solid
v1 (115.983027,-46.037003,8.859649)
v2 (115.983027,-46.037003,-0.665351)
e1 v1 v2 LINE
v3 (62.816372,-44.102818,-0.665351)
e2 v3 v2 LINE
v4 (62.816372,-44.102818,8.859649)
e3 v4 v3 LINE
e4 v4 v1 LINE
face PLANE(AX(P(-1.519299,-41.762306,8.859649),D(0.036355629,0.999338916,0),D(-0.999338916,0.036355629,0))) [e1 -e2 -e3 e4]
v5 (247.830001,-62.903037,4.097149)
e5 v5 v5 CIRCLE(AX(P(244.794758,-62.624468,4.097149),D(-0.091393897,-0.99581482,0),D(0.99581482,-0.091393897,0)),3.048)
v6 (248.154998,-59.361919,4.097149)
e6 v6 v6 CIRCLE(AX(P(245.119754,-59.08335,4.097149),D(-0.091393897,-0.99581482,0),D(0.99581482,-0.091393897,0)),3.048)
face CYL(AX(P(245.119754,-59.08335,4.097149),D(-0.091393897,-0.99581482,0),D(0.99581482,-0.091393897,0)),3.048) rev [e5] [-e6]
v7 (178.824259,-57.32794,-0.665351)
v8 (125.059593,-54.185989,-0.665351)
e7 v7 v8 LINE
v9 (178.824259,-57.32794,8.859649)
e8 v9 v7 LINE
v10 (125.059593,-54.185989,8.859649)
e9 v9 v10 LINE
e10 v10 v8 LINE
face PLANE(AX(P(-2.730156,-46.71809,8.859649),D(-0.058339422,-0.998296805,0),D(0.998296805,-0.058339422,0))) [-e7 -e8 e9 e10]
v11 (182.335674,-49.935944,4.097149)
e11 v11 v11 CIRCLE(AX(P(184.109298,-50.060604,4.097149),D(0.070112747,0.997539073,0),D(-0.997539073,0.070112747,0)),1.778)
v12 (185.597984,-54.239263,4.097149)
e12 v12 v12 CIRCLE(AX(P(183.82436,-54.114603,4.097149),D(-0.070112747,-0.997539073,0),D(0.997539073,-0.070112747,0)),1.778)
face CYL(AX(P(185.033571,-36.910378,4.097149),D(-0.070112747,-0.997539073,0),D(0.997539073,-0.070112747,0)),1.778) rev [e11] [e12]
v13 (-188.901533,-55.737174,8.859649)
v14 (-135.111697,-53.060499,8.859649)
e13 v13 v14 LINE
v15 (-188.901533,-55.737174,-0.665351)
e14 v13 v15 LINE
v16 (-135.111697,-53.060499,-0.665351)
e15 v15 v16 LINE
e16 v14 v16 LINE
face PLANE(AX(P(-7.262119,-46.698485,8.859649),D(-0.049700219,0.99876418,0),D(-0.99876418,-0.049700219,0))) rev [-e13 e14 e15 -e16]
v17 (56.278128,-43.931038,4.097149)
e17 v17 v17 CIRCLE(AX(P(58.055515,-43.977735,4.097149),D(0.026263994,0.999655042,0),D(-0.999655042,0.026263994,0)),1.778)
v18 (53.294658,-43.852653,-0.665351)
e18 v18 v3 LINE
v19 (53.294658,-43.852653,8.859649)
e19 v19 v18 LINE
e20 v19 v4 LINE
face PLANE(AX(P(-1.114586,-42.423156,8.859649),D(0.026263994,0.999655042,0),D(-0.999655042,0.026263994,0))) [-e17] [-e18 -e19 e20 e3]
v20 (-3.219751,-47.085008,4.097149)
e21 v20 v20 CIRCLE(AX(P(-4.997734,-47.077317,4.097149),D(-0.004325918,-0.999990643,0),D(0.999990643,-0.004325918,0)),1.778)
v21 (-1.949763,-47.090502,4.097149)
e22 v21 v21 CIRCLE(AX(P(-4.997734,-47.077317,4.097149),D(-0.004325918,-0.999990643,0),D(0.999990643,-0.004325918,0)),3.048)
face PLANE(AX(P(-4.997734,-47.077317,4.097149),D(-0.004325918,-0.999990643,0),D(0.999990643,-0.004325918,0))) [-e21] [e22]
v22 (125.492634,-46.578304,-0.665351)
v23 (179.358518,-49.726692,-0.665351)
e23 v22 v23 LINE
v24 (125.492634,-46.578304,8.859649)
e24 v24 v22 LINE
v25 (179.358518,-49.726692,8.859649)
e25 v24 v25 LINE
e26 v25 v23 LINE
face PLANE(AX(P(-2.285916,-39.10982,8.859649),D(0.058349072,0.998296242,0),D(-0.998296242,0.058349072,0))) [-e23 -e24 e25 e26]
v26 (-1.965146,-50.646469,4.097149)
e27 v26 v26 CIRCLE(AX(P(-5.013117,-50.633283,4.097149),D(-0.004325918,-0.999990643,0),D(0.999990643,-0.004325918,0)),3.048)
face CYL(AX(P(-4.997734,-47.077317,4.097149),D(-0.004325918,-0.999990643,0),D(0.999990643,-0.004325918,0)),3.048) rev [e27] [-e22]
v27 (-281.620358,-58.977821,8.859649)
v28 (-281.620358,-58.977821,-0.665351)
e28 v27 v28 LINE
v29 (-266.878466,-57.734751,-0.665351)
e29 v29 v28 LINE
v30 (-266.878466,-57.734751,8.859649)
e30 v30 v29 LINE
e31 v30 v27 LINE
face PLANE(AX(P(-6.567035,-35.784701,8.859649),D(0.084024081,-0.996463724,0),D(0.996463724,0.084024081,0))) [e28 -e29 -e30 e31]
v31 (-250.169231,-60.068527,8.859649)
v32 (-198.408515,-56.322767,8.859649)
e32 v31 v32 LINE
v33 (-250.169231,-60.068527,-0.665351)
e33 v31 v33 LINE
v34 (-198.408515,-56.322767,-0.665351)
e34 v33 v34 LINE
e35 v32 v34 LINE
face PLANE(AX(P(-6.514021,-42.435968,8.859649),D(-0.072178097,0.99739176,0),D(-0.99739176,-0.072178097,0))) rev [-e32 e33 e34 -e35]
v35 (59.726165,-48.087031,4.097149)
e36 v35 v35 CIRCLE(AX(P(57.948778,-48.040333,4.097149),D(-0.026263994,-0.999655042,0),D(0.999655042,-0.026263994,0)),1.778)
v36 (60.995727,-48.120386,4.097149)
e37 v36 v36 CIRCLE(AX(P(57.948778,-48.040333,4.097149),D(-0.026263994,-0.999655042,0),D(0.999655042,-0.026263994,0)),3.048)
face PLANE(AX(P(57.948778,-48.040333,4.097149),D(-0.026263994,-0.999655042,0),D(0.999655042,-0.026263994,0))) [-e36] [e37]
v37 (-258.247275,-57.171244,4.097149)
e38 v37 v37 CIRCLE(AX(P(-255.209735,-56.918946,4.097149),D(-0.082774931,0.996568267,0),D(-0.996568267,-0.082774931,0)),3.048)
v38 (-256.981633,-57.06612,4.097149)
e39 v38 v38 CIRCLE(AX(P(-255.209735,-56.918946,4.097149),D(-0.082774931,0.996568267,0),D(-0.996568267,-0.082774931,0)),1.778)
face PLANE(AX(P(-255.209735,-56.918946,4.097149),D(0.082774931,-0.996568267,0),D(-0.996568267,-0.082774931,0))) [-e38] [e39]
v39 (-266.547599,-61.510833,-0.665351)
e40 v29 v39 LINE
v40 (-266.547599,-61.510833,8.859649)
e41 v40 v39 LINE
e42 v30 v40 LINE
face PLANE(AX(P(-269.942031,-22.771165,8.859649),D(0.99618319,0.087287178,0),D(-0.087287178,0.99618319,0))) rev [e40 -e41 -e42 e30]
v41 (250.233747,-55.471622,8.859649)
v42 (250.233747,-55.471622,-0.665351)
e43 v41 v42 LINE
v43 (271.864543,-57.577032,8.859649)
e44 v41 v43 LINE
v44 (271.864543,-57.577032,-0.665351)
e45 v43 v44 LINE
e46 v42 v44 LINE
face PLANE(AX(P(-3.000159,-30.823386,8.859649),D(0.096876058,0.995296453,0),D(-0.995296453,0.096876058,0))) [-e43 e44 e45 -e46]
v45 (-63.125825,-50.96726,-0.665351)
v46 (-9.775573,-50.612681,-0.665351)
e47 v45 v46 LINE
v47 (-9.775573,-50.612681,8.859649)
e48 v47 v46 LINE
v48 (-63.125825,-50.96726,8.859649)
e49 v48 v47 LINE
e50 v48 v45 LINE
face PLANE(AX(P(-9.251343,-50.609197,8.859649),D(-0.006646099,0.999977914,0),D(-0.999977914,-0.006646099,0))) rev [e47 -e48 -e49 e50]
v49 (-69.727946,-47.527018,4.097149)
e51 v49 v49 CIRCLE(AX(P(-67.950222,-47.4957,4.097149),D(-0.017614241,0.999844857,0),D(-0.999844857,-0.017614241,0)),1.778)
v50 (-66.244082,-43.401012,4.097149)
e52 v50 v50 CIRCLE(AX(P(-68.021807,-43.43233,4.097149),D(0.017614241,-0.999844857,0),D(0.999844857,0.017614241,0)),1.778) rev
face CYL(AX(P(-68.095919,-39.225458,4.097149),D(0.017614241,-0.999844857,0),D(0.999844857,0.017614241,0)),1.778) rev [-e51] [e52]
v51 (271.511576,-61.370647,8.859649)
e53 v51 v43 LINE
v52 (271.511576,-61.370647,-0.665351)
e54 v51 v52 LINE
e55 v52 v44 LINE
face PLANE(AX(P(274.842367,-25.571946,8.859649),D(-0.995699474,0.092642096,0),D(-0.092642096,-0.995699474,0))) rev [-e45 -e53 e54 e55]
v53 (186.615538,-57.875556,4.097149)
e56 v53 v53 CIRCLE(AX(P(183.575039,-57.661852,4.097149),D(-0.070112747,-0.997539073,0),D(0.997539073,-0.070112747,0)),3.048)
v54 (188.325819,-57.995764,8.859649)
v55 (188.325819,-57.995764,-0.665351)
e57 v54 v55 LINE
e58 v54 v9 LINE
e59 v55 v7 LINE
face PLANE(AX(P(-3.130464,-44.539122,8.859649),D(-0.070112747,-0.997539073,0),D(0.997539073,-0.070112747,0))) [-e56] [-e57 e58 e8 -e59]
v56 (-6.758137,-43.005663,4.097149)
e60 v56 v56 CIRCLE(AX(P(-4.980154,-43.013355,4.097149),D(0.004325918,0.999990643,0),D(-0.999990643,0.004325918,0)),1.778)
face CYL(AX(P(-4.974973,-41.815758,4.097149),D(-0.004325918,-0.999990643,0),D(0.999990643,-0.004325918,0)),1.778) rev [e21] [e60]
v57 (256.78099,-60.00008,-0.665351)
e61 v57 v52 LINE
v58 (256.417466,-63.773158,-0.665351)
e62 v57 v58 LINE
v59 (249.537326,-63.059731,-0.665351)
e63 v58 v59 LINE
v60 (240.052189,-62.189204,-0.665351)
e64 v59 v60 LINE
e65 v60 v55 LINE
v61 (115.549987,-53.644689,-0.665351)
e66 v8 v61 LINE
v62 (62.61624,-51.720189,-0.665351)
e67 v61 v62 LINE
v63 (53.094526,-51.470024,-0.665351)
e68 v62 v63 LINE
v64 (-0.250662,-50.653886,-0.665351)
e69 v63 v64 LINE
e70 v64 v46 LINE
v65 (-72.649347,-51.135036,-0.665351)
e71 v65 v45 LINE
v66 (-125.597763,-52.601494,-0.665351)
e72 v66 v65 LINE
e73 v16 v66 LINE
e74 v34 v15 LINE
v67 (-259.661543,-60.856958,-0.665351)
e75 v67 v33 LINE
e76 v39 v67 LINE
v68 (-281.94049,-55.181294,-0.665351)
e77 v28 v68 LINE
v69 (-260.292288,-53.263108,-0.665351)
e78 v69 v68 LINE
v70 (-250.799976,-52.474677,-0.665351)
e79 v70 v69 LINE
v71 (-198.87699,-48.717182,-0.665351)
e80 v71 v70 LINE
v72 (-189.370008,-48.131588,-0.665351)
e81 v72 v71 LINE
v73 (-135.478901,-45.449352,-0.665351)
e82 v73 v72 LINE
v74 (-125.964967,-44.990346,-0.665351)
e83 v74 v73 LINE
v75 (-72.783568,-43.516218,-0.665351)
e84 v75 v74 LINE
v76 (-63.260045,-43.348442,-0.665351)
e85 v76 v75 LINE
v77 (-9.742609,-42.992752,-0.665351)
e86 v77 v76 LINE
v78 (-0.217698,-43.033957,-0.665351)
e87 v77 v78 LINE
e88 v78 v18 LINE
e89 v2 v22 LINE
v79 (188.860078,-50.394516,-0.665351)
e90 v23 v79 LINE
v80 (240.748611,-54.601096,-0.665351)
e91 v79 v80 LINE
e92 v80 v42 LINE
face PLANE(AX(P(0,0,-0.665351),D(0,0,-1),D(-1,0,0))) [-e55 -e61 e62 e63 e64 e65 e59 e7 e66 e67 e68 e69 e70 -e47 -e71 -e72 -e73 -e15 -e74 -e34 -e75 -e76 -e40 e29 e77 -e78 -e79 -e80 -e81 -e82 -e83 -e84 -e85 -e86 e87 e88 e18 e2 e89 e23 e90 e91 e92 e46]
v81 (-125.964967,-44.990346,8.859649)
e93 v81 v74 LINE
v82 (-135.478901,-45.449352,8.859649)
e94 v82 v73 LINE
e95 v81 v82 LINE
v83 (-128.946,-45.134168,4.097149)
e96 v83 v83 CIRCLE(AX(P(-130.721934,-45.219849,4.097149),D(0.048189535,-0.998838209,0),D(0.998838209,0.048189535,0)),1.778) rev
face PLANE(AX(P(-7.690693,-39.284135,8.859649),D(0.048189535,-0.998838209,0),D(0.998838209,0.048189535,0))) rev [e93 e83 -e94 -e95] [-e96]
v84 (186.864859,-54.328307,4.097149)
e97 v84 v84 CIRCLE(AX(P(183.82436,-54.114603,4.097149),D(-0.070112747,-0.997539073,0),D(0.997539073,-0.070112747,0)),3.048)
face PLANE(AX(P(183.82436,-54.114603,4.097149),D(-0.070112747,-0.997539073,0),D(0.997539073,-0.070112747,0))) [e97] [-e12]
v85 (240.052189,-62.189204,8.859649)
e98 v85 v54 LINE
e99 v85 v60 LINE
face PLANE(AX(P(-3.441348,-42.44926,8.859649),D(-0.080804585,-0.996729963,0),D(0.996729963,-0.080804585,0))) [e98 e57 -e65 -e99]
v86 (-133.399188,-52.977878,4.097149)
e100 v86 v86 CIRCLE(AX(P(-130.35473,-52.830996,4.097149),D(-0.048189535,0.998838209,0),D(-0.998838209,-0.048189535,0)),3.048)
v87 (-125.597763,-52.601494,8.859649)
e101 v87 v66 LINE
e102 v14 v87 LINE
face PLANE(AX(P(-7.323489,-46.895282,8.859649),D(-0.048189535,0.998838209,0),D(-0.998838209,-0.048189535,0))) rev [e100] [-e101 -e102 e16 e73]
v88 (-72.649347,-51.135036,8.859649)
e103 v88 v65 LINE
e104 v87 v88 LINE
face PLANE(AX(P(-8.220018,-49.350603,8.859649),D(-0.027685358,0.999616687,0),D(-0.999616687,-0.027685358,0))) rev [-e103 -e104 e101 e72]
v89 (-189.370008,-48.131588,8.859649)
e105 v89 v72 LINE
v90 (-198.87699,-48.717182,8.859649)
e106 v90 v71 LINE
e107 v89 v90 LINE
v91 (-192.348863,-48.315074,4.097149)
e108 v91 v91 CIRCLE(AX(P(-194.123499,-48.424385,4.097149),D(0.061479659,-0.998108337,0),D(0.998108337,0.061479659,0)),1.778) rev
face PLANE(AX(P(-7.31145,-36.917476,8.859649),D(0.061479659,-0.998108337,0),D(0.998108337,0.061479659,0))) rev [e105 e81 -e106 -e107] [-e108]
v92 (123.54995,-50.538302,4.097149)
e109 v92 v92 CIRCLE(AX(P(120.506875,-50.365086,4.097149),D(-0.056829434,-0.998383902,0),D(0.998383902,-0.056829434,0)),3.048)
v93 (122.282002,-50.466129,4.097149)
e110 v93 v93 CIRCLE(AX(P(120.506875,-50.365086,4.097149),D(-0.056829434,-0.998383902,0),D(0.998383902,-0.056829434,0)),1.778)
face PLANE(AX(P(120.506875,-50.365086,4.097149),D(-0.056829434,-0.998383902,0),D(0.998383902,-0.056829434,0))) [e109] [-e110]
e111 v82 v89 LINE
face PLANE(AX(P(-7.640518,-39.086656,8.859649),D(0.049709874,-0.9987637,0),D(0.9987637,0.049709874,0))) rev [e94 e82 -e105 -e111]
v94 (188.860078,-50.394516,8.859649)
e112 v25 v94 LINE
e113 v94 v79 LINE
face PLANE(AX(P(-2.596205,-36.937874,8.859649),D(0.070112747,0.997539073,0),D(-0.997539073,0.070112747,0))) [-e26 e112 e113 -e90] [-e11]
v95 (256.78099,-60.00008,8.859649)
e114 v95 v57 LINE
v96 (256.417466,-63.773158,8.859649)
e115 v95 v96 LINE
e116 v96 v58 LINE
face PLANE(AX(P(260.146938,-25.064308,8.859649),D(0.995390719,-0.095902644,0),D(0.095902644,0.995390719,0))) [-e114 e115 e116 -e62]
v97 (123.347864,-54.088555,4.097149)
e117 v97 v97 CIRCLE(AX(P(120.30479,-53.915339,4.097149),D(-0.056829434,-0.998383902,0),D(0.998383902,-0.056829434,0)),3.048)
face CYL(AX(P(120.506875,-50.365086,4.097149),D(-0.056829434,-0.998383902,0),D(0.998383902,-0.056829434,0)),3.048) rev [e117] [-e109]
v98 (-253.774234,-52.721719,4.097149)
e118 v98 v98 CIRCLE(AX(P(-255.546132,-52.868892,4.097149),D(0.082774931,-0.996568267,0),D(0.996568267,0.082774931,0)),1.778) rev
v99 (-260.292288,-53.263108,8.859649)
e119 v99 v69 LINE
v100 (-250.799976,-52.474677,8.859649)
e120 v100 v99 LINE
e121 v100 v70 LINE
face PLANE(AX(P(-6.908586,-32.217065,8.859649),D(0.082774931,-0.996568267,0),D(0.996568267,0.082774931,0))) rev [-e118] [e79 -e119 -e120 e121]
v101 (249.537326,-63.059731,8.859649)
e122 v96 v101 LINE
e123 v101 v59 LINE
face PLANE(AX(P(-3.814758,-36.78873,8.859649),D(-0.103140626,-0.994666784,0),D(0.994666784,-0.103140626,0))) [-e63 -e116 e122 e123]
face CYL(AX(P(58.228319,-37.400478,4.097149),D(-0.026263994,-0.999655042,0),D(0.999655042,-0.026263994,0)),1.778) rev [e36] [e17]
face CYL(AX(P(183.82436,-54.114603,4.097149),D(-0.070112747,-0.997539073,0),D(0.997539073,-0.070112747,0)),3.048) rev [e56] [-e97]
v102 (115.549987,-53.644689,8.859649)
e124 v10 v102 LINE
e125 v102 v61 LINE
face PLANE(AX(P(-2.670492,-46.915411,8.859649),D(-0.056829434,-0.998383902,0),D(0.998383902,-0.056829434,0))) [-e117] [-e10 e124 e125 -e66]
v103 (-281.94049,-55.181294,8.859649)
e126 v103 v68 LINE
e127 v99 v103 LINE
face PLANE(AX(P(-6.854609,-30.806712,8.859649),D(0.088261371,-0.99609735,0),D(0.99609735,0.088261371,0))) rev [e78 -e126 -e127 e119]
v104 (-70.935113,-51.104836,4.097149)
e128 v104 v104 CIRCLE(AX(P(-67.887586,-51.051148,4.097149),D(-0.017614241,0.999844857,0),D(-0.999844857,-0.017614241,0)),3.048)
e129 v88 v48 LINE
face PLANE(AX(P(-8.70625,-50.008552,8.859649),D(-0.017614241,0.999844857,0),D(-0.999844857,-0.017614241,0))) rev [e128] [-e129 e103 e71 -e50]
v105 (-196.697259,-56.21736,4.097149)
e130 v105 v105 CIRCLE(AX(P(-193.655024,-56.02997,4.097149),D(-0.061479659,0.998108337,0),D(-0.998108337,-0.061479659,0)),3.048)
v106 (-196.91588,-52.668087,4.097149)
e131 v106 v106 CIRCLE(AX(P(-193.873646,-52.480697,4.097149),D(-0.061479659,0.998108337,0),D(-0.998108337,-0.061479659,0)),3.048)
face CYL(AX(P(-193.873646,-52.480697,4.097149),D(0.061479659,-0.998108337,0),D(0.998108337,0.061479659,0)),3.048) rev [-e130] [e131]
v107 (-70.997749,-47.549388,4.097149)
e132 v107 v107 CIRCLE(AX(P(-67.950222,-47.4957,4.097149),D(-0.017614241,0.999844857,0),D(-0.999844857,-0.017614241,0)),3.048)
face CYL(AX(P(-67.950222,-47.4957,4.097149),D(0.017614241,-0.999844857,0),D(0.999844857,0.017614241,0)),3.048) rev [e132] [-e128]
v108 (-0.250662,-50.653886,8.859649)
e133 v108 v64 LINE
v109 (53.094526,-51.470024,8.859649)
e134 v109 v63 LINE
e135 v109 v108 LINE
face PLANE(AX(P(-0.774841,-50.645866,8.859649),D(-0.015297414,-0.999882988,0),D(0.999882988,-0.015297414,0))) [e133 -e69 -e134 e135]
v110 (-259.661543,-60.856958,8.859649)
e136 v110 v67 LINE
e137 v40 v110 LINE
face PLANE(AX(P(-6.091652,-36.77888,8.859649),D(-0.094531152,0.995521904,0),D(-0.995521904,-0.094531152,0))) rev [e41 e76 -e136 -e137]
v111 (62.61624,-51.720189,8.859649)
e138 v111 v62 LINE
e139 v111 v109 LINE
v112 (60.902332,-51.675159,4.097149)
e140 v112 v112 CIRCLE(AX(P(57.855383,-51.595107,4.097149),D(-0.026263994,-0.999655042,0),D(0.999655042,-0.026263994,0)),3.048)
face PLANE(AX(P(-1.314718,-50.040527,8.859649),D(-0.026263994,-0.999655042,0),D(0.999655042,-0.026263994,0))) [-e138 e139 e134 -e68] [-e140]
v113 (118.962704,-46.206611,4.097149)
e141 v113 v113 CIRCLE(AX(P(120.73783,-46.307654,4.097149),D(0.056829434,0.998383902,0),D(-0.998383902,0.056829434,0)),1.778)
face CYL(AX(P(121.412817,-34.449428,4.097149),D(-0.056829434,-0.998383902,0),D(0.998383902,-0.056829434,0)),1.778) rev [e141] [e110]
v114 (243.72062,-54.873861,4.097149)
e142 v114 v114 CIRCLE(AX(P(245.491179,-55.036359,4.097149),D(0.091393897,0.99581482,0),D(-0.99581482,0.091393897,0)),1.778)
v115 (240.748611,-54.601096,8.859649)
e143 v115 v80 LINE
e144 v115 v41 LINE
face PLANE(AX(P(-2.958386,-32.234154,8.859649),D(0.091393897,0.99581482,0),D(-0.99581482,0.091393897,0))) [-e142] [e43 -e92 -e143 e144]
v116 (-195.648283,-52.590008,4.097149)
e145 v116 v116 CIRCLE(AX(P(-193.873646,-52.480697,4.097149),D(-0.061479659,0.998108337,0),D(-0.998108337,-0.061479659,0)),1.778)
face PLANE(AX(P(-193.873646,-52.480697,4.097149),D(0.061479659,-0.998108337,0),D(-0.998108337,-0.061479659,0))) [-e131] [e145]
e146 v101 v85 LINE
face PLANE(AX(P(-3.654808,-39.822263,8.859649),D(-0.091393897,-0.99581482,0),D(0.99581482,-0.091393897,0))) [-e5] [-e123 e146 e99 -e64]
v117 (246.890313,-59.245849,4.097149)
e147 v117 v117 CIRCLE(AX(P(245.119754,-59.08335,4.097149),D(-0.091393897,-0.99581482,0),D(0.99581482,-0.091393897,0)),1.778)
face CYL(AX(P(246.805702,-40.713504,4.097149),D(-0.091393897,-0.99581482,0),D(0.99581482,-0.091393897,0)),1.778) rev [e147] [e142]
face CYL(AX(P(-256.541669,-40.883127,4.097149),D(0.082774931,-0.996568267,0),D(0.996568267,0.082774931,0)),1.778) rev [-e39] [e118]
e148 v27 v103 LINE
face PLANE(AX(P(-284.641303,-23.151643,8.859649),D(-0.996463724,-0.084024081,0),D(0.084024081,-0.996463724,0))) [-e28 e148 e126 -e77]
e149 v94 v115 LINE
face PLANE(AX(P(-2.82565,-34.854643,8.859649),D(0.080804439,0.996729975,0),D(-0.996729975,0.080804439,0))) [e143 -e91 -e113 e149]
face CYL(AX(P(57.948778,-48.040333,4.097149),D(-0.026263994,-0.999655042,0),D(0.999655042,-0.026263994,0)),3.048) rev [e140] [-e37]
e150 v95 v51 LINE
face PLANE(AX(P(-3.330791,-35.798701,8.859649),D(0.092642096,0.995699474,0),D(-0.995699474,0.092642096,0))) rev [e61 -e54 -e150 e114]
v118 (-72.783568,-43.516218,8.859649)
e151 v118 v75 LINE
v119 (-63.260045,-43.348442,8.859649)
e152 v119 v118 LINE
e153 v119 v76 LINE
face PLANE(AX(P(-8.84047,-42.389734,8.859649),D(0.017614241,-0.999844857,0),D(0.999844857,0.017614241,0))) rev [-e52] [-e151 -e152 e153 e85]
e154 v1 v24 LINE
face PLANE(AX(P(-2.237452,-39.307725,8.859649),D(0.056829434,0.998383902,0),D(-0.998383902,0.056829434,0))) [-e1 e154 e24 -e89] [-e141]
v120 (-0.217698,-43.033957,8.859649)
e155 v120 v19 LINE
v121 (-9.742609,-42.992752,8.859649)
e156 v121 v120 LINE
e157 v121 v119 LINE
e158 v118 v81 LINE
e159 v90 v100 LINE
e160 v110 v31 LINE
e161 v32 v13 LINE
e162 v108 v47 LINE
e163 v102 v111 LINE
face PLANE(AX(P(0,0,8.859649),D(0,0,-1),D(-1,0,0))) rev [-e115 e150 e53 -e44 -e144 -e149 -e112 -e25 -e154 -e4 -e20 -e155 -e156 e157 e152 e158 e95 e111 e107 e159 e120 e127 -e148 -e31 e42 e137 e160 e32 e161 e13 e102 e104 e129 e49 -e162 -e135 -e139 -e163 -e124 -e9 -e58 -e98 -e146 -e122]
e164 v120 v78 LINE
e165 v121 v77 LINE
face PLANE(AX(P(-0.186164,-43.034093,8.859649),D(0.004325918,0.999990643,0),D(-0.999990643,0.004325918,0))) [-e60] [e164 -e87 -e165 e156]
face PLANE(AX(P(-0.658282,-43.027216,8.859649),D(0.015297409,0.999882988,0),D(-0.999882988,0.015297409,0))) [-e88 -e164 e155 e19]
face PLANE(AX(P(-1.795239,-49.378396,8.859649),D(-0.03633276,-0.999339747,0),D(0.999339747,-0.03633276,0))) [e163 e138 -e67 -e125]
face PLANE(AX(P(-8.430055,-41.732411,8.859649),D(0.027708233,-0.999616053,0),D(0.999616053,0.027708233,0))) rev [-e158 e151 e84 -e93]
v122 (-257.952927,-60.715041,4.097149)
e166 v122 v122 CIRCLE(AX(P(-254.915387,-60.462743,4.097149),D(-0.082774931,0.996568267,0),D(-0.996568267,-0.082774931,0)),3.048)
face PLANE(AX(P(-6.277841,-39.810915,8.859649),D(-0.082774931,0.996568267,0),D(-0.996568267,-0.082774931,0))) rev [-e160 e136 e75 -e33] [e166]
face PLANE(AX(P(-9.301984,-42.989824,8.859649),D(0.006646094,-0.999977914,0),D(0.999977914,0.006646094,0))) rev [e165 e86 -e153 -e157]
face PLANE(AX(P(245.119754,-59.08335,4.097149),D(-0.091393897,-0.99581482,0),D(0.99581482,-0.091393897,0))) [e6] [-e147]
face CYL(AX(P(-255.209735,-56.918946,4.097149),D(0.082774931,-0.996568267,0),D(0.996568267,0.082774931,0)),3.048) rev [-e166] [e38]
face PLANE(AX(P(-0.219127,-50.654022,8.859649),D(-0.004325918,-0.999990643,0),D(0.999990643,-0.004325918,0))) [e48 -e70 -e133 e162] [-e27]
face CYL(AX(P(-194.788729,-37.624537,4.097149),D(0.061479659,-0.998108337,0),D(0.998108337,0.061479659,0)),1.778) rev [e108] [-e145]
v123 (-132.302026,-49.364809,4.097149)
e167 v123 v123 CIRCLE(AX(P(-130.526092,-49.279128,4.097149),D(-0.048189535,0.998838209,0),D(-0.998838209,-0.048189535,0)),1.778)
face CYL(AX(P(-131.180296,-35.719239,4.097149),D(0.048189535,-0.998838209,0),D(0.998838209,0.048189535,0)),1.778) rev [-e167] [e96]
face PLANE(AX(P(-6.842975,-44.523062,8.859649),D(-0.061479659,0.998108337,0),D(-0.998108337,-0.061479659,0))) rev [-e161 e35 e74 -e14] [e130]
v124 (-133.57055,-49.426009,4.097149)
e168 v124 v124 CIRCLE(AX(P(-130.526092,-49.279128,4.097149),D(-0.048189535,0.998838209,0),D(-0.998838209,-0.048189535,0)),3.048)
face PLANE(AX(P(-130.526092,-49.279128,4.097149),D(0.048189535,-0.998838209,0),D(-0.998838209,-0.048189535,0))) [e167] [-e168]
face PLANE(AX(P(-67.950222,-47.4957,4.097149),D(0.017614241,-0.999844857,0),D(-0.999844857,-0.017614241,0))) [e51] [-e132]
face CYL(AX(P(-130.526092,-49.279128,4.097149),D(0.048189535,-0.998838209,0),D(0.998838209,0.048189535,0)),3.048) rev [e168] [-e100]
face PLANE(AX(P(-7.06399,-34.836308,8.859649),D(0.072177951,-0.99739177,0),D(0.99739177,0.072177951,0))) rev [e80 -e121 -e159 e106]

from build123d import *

# Parameters (mm, degrees)
BOSS_EXTRUDE1_DEPTH = 4.7625
SKETCH2_R           = 3.048
CUT_EXTRUDE1_DEPTH  = 3.556
SKETCH3_R           = 1.778
CUT_EXTRUDE2_DEPTH  = 277.706047268
SKETCH4_R           = 3.048
CUT_EXTRUDE3_DEPTH  = 3.556
SKETCH5_R           = 3.048
CUT_EXTRUDE4_DEPTH  = 3.556
SKETCH6_R           = 3.048
CUT_EXTRUDE5_DEPTH  = 3.556
SKETCH7_R           = 3.048
CUT_EXTRUDE6_DEPTH  = 3.556
SKETCH8_R           = 1.778
CUT_EXTRUDE7_DEPTH  = 273.722762612
SKETCH9_R           = 1.778
CUT_EXTRUDE8_DEPTH  = 274.775889667
SKETCH10_R          = 1.778
CUT_EXTRUDE9_DEPTH  = 276.233622552
SKETCH11_R          = 1.778
CUT_EXTRUDE10_DEPTH = 276.83087619


with BuildPart() as part:
    # Sketch1 → Boss-Extrude1 (new, symmetric)
    with BuildSketch(Plane(origin=(0, 0, 4.097149242), x_dir=(-1, 0, 0), z_dir=(0, 0, -1))):
        Polygon((0.250661746, -50.653885537), (5.013117184, -50.633283353), (4.98015369, -43.013354652), (0.217698252, -43.033956836), (-53.294657701, -43.852653014), (-62.816371972, -44.102817558), (-115.983026964, -46.037003418), (-125.492633629, -46.578303782), (-179.358518215, -49.726692243), (-188.860077886, -50.394516158), (-240.748610926, -54.601095566), (-250.233747084, -55.471622439), (-271.864542794, -57.577031547), (-271.511576408, -61.370646542), (-256.780990146, -60.000079995), (-256.417466381, -63.773158253), (-249.537325585, -63.059731366), (-240.052189426, -62.189204494), (-188.325818753, -57.995763897), (-178.824259081, -57.327939981), (-125.059593338, -54.185989113), (-115.549986674, -53.64468875), (-62.616240336, -51.720188977), (-53.094526063, -51.470024432), align=None)
    boss_extrude1 = extrude(amount=BOSS_EXTRUDE1_DEPTH, both=True)

    # Sketch2 → Cut-Extrude1 (cut)
    with BuildSketch(Plane(origin=(-3.654807803, -39.822262509, 0), x_dir=(0.995814819891653, -0.09139389741199735, 0), z_dir=(-0.09139389741199735, -0.995814819891653, 0))):
        with Locations((249.493741553, 4.097149242)):
            Circle(SKETCH2_R)
    cut_extrude1 = extrude(amount=-CUT_EXTRUDE1_DEPTH, mode=Mode.SUBTRACT)

    # Sketch3 → Cut-Extrude2 (cut, through all)
    with BuildSketch(Plane(origin=(-3.329811104, -36.28114501, 0), x_dir=(0.995814819891653, -0.09139389741199735, 0), z_dir=(-0.09139389741199735, -0.995814819891653, 0))):
        with Locations((249.493741553, 4.097149242)):
            Circle(SKETCH3_R)
    cut_extrude2 = extrude(amount=-CUT_EXTRUDE2_DEPTH, mode=Mode.SUBTRACT)

    # Sketch4 → Cut-Extrude3 (cut)
    with BuildSketch(Plane(origin=(-3.130464047, -44.539122171, 0), x_dir=(0.9975390732743608, -0.07011274699317857, 0), z_dir=(-0.07011274699317857, -0.9975390732743608, 0))):
        with Locations((187.166105034, 4.097149242)):
            Circle(SKETCH4_R)
    cut_extrude3 = extrude(amount=-CUT_EXTRUDE3_DEPTH, mode=Mode.SUBTRACT)

    # Sketch5 → Cut-Extrude4 (cut)
    with BuildSketch(Plane(origin=(-2.670492031, -46.915410629, 0), x_dir=(-0.998383901802788, 0.05682943445997907, 0), z_dir=(-0.05682943445997907, -0.9983839018027881, 0))):
        with Locations((-123.174343872, -4.097149242)):
            Circle(SKETCH5_R)
    cut_extrude4 = extrude(amount=-CUT_EXTRUDE4_DEPTH, mode=Mode.SUBTRACT)

    # Sketch6 → Cut-Extrude5 (cut)
    with BuildSketch(Plane(origin=(-1.314717641, -50.040527253, 0), x_dir=(0.9996550418058789, -0.02626399421425536, 0), z_dir=(-0.02626399421425536, -0.9996550418058789, 0))):
        with Locations((59.190519095, 4.097149242)):
            Circle(SKETCH6_R)
    cut_extrude5 = extrude(amount=-CUT_EXTRUDE5_DEPTH, mode=Mode.SUBTRACT)

    # Sketch7 → Cut-Extrude6 (cut)
    with BuildSketch(Plane(origin=(-0.219127188, -50.654021954, 0), x_dir=(-0.9999906431736124, 0.004325917847692405, 0), z_dir=(-0.004325917847692405, -0.9999906431736125, 0))):
        with Locations((4.794034853, -4.097149242)):
            Circle(SKETCH7_R)
    cut_extrude6 = extrude(amount=-CUT_EXTRUDE6_DEPTH, mode=Mode.SUBTRACT)

    # Sketch8 → Cut-Extrude7 (cut, through all)
    with BuildSketch(Plane(origin=(-0.203744224, -47.098055227, 0), x_dir=(0.9999906431736124, -0.004325917847692406, 0), z_dir=(-0.004325917847692406, -0.9999906431736125, 0))):
        with Locations((-4.794034853, 4.097149242)):
            Circle(SKETCH8_R)
    cut_extrude7 = extrude(amount=-CUT_EXTRUDE7_DEPTH, mode=Mode.SUBTRACT)

    # Sketch9 → Cut-Extrude8 (cut, through all)
    with BuildSketch(Plane(origin=(-1.221322877, -46.485753925, 0), x_dir=(0.9996550418058789, -0.02626399421425536, 0), z_dir=(-0.02626399421425536, -0.9996550418058789, 0))):
        with Locations((59.190519095, 4.097149242)):
            Circle(SKETCH9_R)
    cut_extrude8 = extrude(amount=-CUT_EXTRUDE8_DEPTH, mode=Mode.SUBTRACT)

    # Sketch10 → Cut-Extrude9 (cut, through all)
    with BuildSketch(Plane(origin=(-2.468406562, -43.365157475, 0), x_dir=(0.998383901802788, -0.05682943445997909, 0), z_dir=(-0.05682943445997909, -0.9983839018027881, 0))):
        with Locations((123.174343872, 4.097149242)):
            Circle(SKETCH10_R)
    cut_extrude9 = extrude(amount=-CUT_EXTRUDE9_DEPTH, mode=Mode.SUBTRACT)

    # Sketch11 → Cut-Extrude10 (cut, through all)
    with BuildSketch(Plane(origin=(-2.881143118, -40.991873227, 0), x_dir=(-0.9975390732743608, 0.07011274699317857, 0), z_dir=(-0.07011274699317857, -0.9975390732743608, 0))):
        with Locations((-187.166105034, -4.097149242)):
            Circle(SKETCH11_R)
    cut_extrude10 = extrude(amount=-CUT_EXTRUDE10_DEPTH, mode=Mode.SUBTRACT)

    # Mirror1: Boss-Extrude1, Cut-Extrude1, Cut-Extrude2, Cut-Extrude3, Cut-Extrude4, Cut-Extrude5, Cut-Extrude6, Cut-Extrude7, Cut-Extrude8, Cut-Extrude9, Cut-Extrude10 across plane
    add(boss_extrude1.mirror(Plane(origin=(-4.793989996, 0.020738601, 8.859649242), x_dir=(0, 0, 1), z_dir=(-0.9999906431736159, 0.004325917846891031, 0))))
    add(cut_extrude1.mirror(Plane(origin=(-4.793989996, 0.020738601, 8.859649242), x_dir=(0, 0, 1), z_dir=(-0.9999906431736159, 0.004325917846891031, 0))), mode=Mode.SUBTRACT)
    add(cut_extrude2.mirror(Plane(origin=(-4.793989996, 0.020738601, 8.859649242), x_dir=(0, 0, 1), z_dir=(-0.9999906431736159, 0.004325917846891031, 0))), mode=Mode.SUBTRACT)
    add(cut_extrude3.mirror(Plane(origin=(-4.793989996, 0.020738601, 8.859649242), x_dir=(0, 0, 1), z_dir=(-0.9999906431736159, 0.004325917846891031, 0))), mode=Mode.SUBTRACT)
    add(cut_extrude4.mirror(Plane(origin=(-4.793989996, 0.020738601, 8.859649242), x_dir=(0, 0, 1), z_dir=(-0.9999906431736159, 0.004325917846891031, 0))), mode=Mode.SUBTRACT)
    add(cut_extrude5.mirror(Plane(origin=(-4.793989996, 0.020738601, 8.859649242), x_dir=(0, 0, 1), z_dir=(-0.9999906431736159, 0.004325917846891031, 0))), mode=Mode.SUBTRACT)
    add(cut_extrude6.mirror(Plane(origin=(-4.793989996, 0.020738601, 8.859649242), x_dir=(0, 0, 1), z_dir=(-0.9999906431736159, 0.004325917846891031, 0))), mode=Mode.SUBTRACT)
    add(cut_extrude7.mirror(Plane(origin=(-4.793989996, 0.020738601, 8.859649242), x_dir=(0, 0, 1), z_dir=(-0.9999906431736159, 0.004325917846891031, 0))), mode=Mode.SUBTRACT)
    add(cut_extrude8.mirror(Plane(origin=(-4.793989996, 0.020738601, 8.859649242), x_dir=(0, 0, 1), z_dir=(-0.9999906431736159, 0.004325917846891031, 0))), mode=Mode.SUBTRACT)
    add(cut_extrude9.mirror(Plane(origin=(-4.793989996, 0.020738601, 8.859649242), x_dir=(0, 0, 1), z_dir=(-0.9999906431736159, 0.004325917846891031, 0))), mode=Mode.SUBTRACT)
    add(cut_extrude10.mirror(Plane(origin=(-4.793989996, 0.020738601, 8.859649242), x_dir=(0, 0, 1), z_dir=(-0.9999906431736159, 0.004325917846891031, 0))), mode=Mode.SUBTRACT)


solid = part.part
